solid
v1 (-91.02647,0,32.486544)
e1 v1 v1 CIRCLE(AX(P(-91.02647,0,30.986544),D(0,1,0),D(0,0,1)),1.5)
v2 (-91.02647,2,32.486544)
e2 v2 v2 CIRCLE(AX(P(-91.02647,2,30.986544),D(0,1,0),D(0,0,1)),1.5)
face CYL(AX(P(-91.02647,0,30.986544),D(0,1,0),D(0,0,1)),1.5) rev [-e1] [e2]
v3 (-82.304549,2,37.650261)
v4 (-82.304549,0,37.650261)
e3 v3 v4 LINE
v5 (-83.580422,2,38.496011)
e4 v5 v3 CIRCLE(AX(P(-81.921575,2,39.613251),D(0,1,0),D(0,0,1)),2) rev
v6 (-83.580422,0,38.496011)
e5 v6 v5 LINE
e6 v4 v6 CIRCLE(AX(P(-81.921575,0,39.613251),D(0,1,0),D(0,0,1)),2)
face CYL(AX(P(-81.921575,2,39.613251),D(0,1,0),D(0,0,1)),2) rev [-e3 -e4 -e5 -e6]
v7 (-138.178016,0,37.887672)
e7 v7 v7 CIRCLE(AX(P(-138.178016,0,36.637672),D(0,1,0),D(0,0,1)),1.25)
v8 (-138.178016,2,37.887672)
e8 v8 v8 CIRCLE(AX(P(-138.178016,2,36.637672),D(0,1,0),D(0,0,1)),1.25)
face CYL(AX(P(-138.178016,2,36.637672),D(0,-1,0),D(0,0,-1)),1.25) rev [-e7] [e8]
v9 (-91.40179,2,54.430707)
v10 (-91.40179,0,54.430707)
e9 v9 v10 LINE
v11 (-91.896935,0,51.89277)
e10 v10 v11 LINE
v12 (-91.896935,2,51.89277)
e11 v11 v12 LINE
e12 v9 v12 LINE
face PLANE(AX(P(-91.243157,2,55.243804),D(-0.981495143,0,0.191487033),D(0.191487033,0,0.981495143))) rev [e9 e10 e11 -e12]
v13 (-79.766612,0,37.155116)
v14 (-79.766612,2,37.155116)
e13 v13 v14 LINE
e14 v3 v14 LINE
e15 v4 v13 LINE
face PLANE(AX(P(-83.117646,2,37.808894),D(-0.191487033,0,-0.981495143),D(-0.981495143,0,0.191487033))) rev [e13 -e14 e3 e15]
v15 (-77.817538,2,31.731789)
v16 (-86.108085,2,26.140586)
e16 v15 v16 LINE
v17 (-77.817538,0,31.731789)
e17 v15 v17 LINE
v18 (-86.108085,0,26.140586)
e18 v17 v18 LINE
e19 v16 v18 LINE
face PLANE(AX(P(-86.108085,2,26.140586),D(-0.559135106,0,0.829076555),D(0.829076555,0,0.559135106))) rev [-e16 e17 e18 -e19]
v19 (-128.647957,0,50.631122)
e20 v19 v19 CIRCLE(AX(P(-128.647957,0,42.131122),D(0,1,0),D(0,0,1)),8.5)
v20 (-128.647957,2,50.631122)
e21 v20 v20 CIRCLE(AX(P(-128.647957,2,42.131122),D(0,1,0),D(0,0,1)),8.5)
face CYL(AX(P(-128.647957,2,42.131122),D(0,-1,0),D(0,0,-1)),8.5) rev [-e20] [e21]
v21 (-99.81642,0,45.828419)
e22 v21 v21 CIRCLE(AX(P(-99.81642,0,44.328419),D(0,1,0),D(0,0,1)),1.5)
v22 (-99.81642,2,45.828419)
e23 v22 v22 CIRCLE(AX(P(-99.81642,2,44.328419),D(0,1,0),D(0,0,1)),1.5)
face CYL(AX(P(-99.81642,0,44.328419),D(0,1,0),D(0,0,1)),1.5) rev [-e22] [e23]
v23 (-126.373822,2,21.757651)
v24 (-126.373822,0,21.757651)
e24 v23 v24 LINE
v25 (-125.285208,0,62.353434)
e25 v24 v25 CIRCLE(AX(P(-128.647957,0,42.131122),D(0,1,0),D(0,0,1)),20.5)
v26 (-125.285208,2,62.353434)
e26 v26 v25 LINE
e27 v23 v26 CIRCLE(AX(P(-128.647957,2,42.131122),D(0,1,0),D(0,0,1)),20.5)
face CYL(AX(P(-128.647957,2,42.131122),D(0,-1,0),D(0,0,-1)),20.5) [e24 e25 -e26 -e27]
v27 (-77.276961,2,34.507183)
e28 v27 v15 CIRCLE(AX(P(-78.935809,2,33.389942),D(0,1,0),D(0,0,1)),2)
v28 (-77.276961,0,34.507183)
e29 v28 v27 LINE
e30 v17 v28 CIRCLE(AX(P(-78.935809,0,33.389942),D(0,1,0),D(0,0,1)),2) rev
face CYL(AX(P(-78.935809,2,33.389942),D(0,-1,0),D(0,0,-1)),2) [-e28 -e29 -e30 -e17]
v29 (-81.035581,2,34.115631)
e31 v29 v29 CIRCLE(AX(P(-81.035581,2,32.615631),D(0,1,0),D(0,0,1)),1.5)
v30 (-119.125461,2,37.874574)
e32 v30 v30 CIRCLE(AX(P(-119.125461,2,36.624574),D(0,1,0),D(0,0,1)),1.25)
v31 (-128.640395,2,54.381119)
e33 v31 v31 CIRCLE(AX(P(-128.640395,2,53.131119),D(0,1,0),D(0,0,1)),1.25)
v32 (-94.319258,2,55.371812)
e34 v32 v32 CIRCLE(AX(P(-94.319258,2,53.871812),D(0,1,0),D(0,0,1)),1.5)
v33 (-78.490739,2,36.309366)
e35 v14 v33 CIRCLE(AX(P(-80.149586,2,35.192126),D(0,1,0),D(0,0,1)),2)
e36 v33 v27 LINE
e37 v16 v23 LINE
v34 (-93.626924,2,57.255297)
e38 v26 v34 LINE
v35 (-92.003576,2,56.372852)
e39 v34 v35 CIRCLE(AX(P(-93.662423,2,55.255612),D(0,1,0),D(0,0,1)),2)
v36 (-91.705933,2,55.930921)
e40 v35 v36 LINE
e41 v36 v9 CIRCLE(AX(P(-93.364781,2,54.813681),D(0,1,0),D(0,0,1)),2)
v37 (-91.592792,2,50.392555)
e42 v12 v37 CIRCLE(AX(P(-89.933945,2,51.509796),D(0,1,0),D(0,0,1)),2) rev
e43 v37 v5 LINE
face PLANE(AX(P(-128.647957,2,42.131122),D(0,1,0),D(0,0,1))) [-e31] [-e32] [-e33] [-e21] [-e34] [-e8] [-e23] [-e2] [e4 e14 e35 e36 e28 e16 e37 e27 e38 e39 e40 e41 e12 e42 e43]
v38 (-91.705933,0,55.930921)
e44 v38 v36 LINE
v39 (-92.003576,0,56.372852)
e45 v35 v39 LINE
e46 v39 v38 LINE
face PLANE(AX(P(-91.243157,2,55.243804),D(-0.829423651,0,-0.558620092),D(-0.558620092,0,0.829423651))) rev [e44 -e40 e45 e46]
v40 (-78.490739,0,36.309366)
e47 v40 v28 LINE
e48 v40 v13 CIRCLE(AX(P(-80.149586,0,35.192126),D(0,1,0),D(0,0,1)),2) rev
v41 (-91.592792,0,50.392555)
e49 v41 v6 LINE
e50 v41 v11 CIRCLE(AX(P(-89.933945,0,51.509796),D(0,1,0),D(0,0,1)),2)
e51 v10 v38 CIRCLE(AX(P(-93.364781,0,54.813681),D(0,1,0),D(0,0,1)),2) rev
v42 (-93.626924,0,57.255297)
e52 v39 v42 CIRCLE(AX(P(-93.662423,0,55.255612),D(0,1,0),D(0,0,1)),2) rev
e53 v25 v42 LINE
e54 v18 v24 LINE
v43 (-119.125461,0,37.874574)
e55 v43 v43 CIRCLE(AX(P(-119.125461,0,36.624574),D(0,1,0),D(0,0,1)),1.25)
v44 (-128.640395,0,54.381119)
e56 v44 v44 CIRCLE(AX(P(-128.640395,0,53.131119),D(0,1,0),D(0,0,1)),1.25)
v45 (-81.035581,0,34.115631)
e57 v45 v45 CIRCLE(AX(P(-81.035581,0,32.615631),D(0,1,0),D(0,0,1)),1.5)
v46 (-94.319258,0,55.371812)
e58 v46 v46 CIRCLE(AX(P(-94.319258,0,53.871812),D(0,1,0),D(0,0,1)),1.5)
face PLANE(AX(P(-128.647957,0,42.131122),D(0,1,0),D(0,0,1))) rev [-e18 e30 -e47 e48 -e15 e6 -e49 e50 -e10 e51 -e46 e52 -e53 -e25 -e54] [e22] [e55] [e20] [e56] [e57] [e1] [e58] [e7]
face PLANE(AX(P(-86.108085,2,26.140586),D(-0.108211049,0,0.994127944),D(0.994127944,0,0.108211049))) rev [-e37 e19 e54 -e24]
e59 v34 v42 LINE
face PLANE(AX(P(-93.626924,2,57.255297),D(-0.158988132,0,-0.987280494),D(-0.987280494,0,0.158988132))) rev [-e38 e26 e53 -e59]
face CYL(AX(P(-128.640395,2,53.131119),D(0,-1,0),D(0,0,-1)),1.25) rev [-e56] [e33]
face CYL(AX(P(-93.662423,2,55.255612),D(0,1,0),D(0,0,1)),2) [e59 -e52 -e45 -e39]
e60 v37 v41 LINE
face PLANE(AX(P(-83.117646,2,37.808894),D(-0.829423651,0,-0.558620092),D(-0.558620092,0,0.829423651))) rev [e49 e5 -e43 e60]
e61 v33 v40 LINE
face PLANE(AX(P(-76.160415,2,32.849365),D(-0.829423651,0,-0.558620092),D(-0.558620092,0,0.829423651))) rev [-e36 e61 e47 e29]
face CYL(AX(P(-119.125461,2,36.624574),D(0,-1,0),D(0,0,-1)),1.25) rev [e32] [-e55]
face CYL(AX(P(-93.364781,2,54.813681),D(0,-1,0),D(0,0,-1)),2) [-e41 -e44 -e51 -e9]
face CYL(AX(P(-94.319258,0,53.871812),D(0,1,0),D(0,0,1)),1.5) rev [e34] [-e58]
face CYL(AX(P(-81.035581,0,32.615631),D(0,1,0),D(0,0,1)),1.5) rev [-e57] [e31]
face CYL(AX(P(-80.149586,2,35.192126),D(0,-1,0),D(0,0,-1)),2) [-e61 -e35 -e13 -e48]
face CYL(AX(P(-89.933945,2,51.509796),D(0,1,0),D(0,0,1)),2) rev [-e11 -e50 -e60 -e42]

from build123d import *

# Parameters (mm, degrees)
BOSS_EXTRUDE1_DEPTH = 2
SKETCH2_R           = 1.5
CUT_EXTRUDE1_DEPTH  = 162.776916151
FILLET1_R           = 2


with BuildPart() as part:
    # Sketch1 → Boss-Extrude1 (new body)
    with BuildSketch(Plane(origin=(0, 0, 0), x_dir=(1, 0, 0), z_dir=(0, 1, 0))):
        with BuildLine():
            Line((-93.626923886, -57.255296936), (-125.285208035, -62.353434177))
            ThreePointArc((-125.285208035, -62.353434177), (-139.136930256, -59.744510113), (-148.029903031, -48.8087098))
            ThreePointArc((-148.029903031, -48.8087098), (-144.651370762, -29.319378812), (-126.373822338, -21.757651079))
            Line((-126.373822338, -21.757651079), (-86.108085396, -26.140585529))
            Line((-86.108085396, -26.140585529), (-76.160414707, -32.849365164))
            Line((-76.160414707, -32.849365164), (-78.953515167, -36.996483419))
            Line((-78.953515167, -36.996483419), (-83.117646396, -37.808894096))
            Line((-83.117646396, -37.808894096), (-92.055567869, -51.079672511))
            Line((-92.055567869, -51.079672511), (-91.243157193, -55.24380374))
            Line((-91.243157193, -55.24380374), (-92.919017469, -57.732074693))
            Line((-92.919017469, -57.732074693), (-93.626923886, -57.255296936))
        make_face()
        with BuildLine():
            ThreePointArc((-128.01465119, -54.213221054), (-127.558293409, -52.505375167), (-129.266139297, -52.049017386))
            ThreePointArc((-129.266139297, -52.049017386), (-129.722497078, -53.756863273), (-128.01465119, -54.213221054))
        make_face(mode=Mode.SUBTRACT)
        with BuildLine():
            ThreePointArc((-118.499717146, -37.706675985), (-118.043359364, -35.998830097), (-119.751205252, -35.542472316))
            ThreePointArc((-119.751205252, -35.542472316), (-120.207563033, -37.250318204), (-118.499717146, -37.706675985))
        make_face(mode=Mode.SUBTRACT)
        with BuildLine():
            ThreePointArc((-137.552271527, -37.719773921), (-137.095913745, -36.011928034), (-138.803759633, -35.555570253))
            ThreePointArc((-138.803759633, -35.555570253), (-139.260117414, -37.26341614), (-137.552271527, -37.719773921))
        make_face(mode=Mode.SUBTRACT)
        with BuildLine():
            ThreePointArc((-132.903016903, -34.772829346), (-136.006249814, -46.386181381), (-124.392897779, -49.489414293))
            ThreePointArc((-124.392897779, -49.489414293), (-121.289664867, -37.876062257), (-132.903016903, -34.772829346))
        make_face(mode=Mode.SUBTRACT)
    extrude(amount=BOSS_EXTRUDE1_DEPTH)

    # Sketch2 → Cut-Extrude1 (cut, through all)
    with BuildSketch(Plane(origin=(0, 2, 0), x_dir=(1, 0, 0), z_dir=(0, 1, 0))):
        with Locations(Location((-94.319257895, -53.871812037, 0), (0, 0, 270))):
            Circle(SKETCH2_R)
        with Locations(Location((-81.035580782, -32.615630622, 0), (0, 0, 270))):
            Circle(SKETCH2_R)
        with Locations(Location((-99.81641988, -44.328419171, 0), (0, 0, 270))):
            Circle(SKETCH2_R)
        with Locations(Location((-91.026470018, -30.986543755, 0), (0, 0, 270))):
            Circle(SKETCH2_R)
    extrude(amount=-CUT_EXTRUDE1_DEPTH, mode=Mode.SUBTRACT)

    # Fillet1
    # the kernel refuses this fillet: 2 mm, written as the material it adds along each edge
    with BuildSketch(Plane(origin=(-83.117646396, 0, 37.808894096), x_dir=(-0.558620092060103, 0, 0.8294236509448968), z_dir=(0, 1, 0)), Plane(origin=(-92.055567869, 0, 51.079672511), x_dir=(0.191487032856868, 0, 0.9814951432623968), z_dir=(0, 1, 0))) as fillet1_piece_1:
        with BuildLine():
            CenterArc((FILLET1_R * 0.414213562373, FILLET1_R), FILLET1_R, 225, 45)
            Line((-FILLET1_R * 0.292893218813, FILLET1_R * 0.292893218813), (0, 0))
            Line((0, 0), (FILLET1_R * 0.414213562373, 0))
        make_face()
    extrude(amount=2)
    # the kernel refuses this fillet: 2 mm, written as the material it takes off along each edge
    with BuildSketch(Plane(origin=(-76.160414707, -4.996895665, 32.849365164), x_dir=(-0.8290765545202242, 0, -0.5591351059850148), z_dir=(0, 1, 0))) as fillet1_2_piece_1:
        with BuildLine():
            CenterArc((FILLET1_R * 0.999379132971, FILLET1_R), FILLET1_R, 180.035584106, 89.964415894)
            Line((-FILLET1_R * 0.000620674171049, FILLET1_R * 0.999378940233), (0, 0))
            Line((0, 0), (FILLET1_R * 0.999379132971, 0))
        make_face()
    extrude(amount=11.99379133, mode=Mode.SUBTRACT)
    with BuildSketch(Plane(origin=(-78.953515167, -2.071067812, 36.996483419), x_dir=(0.558620092060111, 0, -0.8294236509448913), z_dir=(0, 1, 0))) as fillet1_2_piece_2:
        with BuildLine():
            CenterArc((FILLET1_R * 0.414213562373, FILLET1_R), FILLET1_R, 225, 45)
            Line((-FILLET1_R * 0.292893218813, FILLET1_R * 0.292893218813), (0, 0))
            Line((0, 0), (FILLET1_R * 0.414213562373, 0))
        make_face()
    extrude(amount=6.142135624, mode=Mode.SUBTRACT)
    with BuildSketch(Plane(origin=(-92.919017469, -4.096888539, 57.732074693), x_dir=(-0.8294236509413199, 0, -0.5586200920654141), z_dir=(0, 1, 0))) as fillet1_2_piece_3:
        with BuildLine():
            CenterArc((2, -1.638755416), FILLET1_R, 124.977451645, 55.022548355)
            Line((0, -1.638755416), (0, 0))
            Line((0, 0), (0.853491959, 0))
        make_face()
    extrude(amount=10.193777079, mode=Mode.SUBTRACT)
    with BuildSketch(Plane(origin=(-91.243157193, -2.071067812, 55.24380374), x_dir=(-0.558620092060103, 0, 0.8294236509448968), z_dir=(0, 1, 0))) as fillet1_2_piece_4:
        with BuildLine():
            CenterArc((FILLET1_R * 0.414213562373, -FILLET1_R), FILLET1_R, 90, 45)
            Line((-FILLET1_R * 0.292893218813, -FILLET1_R * 0.292893218813), (0, 0))
            Line((0, 0), (FILLET1_R * 0.414213562373, 0))
        make_face()
    extrude(amount=6.142135624, mode=Mode.SUBTRACT)


solid = part.part
